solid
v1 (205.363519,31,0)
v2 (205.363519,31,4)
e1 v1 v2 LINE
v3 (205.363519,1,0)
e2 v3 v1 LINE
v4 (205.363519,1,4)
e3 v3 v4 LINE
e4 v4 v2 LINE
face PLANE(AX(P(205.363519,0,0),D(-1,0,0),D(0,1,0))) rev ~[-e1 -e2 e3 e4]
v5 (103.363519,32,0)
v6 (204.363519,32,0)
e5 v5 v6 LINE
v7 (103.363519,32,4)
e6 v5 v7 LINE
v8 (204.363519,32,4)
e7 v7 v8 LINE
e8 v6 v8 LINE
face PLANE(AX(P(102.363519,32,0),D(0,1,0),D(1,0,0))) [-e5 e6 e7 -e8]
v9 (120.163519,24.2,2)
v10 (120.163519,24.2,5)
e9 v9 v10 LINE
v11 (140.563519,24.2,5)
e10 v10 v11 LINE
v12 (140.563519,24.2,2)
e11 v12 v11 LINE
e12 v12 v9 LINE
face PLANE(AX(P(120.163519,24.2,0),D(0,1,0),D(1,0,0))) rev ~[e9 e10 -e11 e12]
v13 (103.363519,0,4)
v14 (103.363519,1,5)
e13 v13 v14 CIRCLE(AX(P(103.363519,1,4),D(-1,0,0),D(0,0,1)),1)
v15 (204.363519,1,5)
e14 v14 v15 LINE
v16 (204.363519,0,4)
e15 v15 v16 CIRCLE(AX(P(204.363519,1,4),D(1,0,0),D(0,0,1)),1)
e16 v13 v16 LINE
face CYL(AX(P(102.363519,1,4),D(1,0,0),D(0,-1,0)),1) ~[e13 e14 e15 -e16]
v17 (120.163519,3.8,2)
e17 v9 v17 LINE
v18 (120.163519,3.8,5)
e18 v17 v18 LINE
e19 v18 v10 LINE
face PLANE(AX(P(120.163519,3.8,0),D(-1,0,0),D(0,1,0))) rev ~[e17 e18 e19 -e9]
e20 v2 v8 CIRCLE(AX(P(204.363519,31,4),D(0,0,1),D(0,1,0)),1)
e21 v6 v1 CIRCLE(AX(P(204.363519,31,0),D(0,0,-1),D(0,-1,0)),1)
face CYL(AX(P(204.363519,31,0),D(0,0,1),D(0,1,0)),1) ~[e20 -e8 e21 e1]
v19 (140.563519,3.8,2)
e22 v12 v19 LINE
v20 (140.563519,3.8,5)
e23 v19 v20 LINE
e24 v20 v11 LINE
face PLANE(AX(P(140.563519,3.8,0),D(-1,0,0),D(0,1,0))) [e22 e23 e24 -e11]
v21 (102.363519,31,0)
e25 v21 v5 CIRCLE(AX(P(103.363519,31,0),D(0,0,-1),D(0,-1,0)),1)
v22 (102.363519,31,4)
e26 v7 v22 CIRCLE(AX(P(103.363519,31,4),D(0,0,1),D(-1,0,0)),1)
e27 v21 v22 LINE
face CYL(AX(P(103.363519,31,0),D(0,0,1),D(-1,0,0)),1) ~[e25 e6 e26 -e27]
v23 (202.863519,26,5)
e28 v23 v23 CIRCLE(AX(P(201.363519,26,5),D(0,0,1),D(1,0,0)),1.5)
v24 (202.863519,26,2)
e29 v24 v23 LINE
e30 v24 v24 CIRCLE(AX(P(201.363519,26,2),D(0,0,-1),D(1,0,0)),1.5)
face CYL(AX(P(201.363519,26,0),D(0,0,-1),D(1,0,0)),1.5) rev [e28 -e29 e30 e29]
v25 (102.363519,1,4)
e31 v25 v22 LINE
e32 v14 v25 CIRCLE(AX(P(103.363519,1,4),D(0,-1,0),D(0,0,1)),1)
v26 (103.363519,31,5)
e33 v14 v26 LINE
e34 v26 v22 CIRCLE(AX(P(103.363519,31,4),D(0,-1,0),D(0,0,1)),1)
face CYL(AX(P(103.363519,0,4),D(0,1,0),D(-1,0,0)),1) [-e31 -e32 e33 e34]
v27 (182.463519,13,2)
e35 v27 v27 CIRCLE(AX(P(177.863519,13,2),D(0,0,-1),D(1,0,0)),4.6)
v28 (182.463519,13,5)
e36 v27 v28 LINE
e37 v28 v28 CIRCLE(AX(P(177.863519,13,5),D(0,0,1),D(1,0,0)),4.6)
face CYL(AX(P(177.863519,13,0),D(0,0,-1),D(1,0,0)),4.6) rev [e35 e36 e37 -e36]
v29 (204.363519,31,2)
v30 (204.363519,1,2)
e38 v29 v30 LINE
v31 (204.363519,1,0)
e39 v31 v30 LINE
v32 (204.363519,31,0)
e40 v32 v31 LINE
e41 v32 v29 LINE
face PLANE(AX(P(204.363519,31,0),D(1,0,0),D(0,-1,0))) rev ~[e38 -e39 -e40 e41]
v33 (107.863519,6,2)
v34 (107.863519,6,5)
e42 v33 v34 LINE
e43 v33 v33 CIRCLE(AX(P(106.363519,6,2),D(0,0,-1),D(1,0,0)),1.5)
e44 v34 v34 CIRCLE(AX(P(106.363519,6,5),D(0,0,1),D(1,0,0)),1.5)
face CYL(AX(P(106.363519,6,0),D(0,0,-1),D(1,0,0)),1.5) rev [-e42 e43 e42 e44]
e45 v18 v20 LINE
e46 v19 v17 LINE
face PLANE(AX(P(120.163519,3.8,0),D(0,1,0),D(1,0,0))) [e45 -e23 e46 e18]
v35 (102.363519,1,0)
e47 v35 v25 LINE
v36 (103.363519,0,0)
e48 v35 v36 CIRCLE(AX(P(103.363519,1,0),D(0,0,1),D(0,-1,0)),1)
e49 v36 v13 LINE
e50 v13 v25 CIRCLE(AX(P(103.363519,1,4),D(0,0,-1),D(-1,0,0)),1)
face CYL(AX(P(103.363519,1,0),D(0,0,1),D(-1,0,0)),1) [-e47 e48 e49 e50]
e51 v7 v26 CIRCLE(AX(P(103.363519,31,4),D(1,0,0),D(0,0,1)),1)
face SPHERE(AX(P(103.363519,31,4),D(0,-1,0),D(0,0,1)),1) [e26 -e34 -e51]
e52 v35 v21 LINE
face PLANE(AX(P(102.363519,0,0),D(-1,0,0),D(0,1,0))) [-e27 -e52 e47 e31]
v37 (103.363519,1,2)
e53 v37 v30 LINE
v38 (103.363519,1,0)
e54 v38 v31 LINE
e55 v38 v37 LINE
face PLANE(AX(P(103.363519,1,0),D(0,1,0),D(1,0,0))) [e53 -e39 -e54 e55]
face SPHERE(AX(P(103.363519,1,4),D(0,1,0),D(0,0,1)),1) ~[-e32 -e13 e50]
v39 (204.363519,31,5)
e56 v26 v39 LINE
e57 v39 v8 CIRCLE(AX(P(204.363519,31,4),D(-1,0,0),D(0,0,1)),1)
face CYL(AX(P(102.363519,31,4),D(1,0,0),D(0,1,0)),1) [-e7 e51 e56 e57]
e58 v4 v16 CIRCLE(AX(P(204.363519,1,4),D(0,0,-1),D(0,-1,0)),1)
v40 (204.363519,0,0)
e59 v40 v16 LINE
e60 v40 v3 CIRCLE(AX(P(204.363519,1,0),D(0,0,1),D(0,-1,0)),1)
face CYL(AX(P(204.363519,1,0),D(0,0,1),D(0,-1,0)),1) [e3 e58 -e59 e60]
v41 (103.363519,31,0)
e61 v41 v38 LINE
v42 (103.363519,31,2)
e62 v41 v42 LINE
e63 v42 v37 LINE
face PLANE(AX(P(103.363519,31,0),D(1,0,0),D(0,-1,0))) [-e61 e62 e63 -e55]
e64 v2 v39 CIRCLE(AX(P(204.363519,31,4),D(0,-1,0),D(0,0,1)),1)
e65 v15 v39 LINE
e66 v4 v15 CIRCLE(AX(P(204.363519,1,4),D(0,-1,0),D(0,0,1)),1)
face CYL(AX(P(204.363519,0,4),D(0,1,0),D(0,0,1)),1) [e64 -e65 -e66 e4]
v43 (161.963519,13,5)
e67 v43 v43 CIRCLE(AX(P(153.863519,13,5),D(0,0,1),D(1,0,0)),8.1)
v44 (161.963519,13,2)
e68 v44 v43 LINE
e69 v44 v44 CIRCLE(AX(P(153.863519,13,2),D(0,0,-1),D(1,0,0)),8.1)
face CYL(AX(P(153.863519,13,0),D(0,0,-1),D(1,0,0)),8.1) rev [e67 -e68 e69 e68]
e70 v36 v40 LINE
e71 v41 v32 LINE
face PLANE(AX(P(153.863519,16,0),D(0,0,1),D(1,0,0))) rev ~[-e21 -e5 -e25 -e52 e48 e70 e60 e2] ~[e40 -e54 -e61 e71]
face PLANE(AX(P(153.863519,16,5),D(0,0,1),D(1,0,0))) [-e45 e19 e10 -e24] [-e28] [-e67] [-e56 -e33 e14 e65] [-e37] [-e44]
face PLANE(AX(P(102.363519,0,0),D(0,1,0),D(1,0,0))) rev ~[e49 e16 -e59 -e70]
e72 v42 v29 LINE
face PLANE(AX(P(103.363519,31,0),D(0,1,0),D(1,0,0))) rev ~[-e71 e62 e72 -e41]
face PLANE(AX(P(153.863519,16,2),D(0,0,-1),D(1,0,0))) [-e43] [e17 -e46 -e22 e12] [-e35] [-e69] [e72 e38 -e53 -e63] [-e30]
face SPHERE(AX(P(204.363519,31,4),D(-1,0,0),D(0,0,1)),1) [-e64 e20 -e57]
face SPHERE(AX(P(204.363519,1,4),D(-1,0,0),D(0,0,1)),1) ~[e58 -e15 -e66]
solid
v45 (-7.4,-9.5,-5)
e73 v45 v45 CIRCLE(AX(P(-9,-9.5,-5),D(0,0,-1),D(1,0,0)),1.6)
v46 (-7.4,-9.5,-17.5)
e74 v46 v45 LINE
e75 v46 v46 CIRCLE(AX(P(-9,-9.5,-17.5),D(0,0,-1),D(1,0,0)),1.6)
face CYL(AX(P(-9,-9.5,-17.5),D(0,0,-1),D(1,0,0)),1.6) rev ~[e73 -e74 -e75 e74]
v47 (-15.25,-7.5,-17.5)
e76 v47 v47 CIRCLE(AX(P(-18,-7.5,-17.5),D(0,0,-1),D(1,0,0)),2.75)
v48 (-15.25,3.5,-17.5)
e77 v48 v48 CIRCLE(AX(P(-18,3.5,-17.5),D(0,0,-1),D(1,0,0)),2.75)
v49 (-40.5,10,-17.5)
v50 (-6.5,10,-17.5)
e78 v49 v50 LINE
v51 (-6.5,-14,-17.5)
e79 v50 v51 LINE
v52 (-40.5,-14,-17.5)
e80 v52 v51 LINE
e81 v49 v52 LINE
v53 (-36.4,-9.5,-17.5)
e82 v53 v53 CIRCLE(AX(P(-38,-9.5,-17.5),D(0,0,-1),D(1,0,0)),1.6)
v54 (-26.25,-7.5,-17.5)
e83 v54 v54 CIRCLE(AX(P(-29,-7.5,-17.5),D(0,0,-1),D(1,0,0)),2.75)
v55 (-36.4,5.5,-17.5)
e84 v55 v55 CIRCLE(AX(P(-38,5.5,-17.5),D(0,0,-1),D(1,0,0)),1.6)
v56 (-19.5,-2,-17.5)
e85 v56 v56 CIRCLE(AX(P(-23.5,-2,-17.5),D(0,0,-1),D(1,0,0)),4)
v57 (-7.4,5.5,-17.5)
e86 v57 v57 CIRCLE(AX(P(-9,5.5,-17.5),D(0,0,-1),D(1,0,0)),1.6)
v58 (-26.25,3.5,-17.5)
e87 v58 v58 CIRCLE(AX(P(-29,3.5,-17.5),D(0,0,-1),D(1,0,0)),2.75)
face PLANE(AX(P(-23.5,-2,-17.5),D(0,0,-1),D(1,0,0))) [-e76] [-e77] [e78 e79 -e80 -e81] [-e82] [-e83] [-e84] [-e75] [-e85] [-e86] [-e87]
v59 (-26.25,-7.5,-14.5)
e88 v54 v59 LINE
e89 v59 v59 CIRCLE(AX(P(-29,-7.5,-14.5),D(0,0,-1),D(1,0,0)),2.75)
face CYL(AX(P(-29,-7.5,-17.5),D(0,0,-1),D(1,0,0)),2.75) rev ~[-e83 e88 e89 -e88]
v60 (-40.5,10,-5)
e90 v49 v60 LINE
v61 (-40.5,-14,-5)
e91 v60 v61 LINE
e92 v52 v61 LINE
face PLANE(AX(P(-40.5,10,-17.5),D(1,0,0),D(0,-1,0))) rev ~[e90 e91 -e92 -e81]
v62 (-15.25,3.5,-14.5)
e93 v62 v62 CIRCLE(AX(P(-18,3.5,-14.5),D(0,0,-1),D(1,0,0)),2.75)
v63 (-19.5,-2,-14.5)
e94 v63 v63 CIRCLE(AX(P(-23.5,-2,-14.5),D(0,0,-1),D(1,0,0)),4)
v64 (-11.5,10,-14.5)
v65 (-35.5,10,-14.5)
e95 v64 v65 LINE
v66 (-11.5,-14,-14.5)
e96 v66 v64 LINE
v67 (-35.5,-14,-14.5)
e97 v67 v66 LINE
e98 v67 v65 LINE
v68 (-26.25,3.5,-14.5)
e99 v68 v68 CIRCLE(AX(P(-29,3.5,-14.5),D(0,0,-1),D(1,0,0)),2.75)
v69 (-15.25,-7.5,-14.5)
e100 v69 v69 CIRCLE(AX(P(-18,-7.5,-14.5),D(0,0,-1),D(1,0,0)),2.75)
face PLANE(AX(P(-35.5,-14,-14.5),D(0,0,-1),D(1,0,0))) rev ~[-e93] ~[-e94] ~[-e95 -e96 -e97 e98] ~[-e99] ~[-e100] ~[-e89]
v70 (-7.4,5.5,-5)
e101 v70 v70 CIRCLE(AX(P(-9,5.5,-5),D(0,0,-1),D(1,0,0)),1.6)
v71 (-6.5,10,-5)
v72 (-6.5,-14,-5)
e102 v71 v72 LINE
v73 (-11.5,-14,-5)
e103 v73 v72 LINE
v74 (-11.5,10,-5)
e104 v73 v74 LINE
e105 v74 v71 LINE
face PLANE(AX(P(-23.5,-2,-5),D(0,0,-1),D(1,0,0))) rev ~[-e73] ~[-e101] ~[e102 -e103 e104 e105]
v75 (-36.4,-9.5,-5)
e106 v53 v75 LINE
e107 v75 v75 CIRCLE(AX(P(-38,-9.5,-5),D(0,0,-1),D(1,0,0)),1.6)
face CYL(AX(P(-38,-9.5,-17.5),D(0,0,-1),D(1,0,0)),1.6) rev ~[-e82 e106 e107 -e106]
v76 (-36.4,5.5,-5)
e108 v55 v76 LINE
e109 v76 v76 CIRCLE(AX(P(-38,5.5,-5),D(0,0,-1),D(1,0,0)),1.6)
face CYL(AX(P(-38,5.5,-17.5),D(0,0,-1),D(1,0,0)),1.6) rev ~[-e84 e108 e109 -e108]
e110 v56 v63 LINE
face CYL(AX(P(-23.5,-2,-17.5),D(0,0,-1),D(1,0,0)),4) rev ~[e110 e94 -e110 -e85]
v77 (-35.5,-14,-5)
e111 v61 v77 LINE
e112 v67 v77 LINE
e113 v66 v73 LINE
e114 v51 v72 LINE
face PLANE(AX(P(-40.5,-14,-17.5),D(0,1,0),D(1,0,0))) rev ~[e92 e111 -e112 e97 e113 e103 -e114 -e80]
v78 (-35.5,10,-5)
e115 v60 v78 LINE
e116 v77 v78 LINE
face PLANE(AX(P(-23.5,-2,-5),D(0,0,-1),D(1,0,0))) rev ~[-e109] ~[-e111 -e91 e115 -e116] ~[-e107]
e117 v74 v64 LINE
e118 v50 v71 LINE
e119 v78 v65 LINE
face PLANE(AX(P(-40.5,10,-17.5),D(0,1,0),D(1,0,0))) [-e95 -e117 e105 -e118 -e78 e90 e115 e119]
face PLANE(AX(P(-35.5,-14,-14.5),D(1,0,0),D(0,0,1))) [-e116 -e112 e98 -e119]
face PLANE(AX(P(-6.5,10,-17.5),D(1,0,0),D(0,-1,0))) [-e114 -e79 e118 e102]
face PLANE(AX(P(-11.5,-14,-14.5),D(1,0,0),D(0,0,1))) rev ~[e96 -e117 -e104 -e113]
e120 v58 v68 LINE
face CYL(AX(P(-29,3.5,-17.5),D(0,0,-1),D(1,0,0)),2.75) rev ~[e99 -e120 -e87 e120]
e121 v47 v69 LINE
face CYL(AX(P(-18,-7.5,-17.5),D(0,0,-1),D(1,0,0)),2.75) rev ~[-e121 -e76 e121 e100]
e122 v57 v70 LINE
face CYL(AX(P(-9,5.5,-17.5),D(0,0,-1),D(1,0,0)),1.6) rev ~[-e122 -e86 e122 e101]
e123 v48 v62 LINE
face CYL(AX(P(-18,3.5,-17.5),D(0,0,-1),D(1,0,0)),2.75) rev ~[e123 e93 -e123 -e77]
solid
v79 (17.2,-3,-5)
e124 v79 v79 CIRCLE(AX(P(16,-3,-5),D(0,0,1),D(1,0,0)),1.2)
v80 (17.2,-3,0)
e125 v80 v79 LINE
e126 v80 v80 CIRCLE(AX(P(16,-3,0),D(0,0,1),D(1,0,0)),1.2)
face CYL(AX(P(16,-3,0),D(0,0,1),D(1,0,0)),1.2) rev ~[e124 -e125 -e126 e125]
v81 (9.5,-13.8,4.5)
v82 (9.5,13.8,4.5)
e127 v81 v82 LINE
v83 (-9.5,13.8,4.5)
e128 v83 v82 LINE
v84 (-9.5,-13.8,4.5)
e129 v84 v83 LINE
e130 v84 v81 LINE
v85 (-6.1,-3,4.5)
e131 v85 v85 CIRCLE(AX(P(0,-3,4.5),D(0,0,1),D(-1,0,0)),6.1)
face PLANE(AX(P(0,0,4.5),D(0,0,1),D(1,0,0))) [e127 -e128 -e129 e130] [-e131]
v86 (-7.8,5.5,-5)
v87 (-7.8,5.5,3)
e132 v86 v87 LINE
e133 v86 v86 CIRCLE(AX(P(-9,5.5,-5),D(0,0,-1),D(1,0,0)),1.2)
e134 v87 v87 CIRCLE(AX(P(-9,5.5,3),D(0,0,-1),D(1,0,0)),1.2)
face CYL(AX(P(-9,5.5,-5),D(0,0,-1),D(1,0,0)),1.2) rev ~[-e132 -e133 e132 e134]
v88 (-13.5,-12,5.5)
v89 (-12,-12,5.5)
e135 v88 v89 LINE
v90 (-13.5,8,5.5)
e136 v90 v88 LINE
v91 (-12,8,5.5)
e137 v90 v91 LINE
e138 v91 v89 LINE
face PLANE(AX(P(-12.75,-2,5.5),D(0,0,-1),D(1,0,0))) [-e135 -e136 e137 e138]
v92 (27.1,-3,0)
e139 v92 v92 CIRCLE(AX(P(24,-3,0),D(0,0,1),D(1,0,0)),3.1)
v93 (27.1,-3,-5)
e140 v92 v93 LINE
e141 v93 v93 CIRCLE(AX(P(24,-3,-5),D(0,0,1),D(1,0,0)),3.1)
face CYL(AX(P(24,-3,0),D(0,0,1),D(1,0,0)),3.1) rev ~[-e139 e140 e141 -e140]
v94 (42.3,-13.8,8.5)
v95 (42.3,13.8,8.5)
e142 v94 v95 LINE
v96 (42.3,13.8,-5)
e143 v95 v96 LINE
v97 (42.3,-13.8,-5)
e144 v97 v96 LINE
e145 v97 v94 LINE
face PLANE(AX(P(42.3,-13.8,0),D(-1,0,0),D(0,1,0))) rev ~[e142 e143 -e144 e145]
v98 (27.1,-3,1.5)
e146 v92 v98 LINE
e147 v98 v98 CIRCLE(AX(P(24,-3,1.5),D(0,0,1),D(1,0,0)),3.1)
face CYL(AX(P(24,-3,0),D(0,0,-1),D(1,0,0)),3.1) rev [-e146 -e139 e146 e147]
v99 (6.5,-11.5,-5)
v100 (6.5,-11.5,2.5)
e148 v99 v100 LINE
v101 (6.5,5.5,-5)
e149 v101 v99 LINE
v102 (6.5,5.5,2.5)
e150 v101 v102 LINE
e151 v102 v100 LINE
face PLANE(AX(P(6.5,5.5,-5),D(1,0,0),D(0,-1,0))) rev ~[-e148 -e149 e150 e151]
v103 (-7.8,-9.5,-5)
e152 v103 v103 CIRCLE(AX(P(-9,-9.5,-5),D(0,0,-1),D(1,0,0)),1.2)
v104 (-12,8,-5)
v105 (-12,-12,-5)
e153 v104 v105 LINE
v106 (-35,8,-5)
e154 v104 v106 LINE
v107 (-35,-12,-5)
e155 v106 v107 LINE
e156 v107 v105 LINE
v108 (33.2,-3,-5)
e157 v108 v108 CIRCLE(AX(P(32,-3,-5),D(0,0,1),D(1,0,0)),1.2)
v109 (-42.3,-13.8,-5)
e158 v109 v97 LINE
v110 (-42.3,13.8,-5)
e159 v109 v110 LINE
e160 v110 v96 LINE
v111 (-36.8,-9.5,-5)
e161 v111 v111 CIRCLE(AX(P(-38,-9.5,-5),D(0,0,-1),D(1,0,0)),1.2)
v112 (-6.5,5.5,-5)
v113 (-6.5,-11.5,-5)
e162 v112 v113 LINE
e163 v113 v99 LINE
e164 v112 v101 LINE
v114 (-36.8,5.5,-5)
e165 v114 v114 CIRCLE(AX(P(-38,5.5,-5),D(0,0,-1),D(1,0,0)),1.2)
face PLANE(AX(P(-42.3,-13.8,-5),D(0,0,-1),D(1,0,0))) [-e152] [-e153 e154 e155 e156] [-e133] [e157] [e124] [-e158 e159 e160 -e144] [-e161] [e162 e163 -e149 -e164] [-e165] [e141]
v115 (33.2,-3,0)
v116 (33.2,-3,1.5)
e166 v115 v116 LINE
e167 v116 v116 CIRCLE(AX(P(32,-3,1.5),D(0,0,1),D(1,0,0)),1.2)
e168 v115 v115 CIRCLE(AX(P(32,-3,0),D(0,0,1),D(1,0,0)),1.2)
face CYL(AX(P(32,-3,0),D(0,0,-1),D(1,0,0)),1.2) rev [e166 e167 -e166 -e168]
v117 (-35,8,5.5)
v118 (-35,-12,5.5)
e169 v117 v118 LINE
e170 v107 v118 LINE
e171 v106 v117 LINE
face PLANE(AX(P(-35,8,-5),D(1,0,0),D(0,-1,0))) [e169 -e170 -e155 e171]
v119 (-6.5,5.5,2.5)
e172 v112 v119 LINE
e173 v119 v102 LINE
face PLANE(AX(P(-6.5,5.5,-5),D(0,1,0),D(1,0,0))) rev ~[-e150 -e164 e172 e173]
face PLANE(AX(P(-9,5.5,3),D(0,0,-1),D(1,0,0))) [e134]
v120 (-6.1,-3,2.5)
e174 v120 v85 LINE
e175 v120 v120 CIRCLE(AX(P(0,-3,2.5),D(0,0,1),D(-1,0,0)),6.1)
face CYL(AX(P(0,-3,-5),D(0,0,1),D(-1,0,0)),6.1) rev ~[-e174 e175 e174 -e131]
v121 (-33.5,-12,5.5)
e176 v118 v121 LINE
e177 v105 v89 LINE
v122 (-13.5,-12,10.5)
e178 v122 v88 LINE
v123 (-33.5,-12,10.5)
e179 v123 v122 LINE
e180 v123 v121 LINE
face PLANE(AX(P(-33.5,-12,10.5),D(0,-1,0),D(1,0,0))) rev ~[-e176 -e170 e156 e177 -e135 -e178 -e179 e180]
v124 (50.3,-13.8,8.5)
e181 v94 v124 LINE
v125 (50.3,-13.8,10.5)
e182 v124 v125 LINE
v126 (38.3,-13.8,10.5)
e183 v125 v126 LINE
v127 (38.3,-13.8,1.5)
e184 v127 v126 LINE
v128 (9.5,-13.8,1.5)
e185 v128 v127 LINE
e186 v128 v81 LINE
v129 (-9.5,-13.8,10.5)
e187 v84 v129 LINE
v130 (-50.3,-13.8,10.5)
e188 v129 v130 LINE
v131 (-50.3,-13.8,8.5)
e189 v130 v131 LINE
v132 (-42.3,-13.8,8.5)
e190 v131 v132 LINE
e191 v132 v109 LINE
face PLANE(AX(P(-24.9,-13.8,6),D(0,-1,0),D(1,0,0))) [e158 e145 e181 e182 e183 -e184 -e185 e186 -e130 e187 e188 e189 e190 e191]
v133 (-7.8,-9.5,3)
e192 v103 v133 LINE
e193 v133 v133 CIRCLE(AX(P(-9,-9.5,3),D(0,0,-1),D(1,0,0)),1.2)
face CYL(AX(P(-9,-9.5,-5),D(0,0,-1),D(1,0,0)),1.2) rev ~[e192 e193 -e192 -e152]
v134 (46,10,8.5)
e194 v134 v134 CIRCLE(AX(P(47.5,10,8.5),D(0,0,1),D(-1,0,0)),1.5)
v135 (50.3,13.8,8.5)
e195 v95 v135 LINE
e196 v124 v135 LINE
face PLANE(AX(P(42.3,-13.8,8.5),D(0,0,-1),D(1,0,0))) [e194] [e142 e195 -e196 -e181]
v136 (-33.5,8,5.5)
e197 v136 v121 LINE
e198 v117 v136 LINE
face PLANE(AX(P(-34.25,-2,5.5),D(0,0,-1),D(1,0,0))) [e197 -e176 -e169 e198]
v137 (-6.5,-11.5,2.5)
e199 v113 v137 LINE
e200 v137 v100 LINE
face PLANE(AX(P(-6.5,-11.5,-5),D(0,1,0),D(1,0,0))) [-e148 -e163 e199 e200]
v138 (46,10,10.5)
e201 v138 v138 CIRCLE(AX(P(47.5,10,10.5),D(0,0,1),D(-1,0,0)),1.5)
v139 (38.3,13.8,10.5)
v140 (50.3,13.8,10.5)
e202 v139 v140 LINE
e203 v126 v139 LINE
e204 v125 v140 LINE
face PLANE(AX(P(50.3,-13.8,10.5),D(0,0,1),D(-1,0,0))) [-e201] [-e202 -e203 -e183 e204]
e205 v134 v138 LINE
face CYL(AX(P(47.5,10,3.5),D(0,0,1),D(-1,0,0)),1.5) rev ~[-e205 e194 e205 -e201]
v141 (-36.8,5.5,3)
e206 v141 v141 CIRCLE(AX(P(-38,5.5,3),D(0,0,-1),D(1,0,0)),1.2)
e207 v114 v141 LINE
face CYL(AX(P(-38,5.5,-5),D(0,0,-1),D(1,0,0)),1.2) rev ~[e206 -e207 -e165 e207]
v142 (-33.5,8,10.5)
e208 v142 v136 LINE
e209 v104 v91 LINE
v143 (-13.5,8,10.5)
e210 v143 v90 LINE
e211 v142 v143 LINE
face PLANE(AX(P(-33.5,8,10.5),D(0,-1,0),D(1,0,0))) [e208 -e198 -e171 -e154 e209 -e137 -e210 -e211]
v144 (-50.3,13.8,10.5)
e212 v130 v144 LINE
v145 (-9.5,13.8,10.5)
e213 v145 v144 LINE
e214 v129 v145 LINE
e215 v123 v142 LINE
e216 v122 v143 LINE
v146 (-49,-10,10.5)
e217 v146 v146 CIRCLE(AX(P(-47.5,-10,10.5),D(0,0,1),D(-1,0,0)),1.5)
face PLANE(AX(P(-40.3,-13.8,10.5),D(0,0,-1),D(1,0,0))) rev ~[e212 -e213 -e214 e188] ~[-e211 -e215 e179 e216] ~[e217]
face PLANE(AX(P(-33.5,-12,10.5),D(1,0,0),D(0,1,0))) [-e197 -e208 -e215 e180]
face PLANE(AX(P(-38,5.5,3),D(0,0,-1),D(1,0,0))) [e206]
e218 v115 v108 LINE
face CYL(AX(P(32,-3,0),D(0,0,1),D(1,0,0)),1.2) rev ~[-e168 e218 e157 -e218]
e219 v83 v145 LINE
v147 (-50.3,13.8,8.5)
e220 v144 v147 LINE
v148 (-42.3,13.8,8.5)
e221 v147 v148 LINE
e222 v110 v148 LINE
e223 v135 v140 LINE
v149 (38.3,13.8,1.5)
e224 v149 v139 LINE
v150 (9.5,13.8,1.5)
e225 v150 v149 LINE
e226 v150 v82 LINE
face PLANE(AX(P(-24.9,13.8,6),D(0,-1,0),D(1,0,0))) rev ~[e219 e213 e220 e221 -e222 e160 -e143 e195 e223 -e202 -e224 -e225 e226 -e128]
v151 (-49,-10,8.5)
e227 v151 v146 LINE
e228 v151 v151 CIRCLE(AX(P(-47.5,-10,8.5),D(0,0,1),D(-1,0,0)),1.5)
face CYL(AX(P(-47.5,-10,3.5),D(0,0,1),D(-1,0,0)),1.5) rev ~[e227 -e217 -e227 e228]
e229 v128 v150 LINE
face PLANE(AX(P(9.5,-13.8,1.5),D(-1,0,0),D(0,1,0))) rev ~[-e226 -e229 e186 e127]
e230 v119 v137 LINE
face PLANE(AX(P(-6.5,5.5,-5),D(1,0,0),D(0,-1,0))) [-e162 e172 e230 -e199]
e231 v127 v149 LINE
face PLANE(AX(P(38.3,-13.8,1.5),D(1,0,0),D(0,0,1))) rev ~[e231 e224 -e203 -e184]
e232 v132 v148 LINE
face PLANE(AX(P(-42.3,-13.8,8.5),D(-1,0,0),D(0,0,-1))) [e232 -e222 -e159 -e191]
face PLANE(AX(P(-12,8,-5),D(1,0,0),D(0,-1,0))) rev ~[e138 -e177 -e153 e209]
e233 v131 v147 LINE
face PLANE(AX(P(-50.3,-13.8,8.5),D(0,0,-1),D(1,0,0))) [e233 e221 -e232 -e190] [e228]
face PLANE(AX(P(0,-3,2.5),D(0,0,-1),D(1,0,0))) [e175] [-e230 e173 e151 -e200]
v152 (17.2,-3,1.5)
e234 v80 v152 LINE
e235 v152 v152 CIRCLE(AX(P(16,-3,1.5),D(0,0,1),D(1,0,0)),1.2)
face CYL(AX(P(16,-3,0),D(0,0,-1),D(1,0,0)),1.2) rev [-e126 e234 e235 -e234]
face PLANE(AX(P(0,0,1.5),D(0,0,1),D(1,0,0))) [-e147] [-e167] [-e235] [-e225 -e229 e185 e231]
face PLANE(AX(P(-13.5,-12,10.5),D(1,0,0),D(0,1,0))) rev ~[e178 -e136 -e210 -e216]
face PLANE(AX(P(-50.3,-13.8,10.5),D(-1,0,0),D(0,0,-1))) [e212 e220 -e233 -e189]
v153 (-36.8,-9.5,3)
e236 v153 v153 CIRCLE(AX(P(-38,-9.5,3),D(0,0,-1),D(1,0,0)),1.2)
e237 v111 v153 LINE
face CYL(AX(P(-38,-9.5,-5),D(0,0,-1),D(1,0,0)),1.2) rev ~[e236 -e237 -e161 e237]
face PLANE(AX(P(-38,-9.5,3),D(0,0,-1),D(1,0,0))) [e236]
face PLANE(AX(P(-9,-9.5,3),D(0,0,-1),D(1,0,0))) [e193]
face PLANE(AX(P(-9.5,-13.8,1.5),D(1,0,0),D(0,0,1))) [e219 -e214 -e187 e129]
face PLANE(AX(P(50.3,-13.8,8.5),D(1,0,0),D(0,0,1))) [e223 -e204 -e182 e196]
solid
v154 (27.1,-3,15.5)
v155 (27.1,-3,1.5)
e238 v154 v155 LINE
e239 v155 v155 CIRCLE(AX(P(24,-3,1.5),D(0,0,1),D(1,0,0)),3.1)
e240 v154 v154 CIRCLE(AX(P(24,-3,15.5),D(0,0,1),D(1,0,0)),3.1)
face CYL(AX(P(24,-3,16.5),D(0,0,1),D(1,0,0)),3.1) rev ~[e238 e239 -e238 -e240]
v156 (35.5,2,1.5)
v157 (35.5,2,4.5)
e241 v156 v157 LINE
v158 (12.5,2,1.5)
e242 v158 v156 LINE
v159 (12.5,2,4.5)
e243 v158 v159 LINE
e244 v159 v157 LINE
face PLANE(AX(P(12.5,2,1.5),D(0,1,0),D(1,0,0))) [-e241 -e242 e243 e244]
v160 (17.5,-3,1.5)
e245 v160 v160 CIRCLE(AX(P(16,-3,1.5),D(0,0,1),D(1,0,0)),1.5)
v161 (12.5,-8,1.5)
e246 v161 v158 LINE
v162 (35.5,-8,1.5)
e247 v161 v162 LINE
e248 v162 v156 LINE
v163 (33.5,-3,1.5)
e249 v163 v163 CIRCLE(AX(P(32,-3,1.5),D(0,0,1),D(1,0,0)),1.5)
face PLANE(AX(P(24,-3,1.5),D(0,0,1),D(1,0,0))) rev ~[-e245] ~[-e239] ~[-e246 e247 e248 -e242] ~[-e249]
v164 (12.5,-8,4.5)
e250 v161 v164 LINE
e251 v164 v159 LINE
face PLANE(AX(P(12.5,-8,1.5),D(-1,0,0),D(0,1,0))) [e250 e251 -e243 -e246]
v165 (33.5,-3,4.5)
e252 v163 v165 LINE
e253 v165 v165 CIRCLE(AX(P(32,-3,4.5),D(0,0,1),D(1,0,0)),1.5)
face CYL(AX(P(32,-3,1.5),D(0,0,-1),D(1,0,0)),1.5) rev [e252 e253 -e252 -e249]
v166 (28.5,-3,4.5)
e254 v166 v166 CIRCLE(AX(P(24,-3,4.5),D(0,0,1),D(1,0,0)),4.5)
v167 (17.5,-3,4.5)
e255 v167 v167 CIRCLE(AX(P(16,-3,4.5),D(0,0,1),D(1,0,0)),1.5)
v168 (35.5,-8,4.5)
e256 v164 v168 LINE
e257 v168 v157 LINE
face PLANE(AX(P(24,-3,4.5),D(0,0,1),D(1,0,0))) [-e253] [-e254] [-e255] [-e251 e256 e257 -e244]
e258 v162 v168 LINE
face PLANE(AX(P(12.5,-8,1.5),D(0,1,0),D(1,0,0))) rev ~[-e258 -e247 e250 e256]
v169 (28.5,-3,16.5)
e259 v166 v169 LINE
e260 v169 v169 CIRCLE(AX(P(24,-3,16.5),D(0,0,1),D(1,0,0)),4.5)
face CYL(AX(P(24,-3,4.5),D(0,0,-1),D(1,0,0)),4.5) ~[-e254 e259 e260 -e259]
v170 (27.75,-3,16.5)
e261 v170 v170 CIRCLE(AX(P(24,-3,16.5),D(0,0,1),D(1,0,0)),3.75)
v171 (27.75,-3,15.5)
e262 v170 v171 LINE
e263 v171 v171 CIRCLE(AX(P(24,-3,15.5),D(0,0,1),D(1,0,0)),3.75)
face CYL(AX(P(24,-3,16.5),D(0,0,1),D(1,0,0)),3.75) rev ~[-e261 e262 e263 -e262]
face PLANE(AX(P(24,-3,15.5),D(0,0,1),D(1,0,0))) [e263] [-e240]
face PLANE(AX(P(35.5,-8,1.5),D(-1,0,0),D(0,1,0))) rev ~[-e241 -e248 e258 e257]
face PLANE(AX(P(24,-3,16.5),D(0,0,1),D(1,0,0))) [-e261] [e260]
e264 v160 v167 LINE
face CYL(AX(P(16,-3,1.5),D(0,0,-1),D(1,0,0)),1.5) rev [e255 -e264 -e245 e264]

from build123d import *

# Parameters (mm, degrees)
F0_W      = 84.6
F0_H      = 27.6
F0_R      = 1.2
F0_R_2    = 3.1
F1_DEPTH  = 1.5
F2_W      = 103
F2_H      = 32
F2_R      = 1.5
F2_W_2    = 20.4
F2_H_2    = 20.4
F2_R_2    = 8.1
F2_R_3    = 4.6
F3_DEPTH  = 5
F4_W      = 101
F4_H      = 30
F5_DEPTH  = 2
F6_R      = 1
F7_W      = 8
F7_H      = 2
F8_DEPTH  = 27.6
F9_D      = 3
F9_DEPTH  = 5
F9_START  = 8.5
F9_TIP    = 0.9012909285
F10_W     = 23
F10_H     = 10
F10_R     = 1.5
F11_DEPTH = 3
F12_R     = 4.5
F13_DEPTH = 12
F14_R     = 3.1
F15_DEPTH = 25
F16_W     = 19
F16_H     = 27.6
F17_DEPTH = 3
F18_D     = 12.2
F18_DEPTH = 5
F18_TIP   = 3.6652497761
F19_R     = 3.75
F20_DEPTH = 1
F21_W     = 30.8
F21_H     = 9
F21_W_2   = 2
F21_W_3   = 84.6
F21_H_2   = 5
F22_DEPTH = 27.6
F23_W     = 20
F23_H     = 20
F24_DEPTH = 25
F25_W     = 1.5
F25_H     = 20
F26_DEPTH = 10.5
F27_W     = 13
F27_H     = 17
F28_DEPTH = 7.5
F30_W     = 34
F30_H     = 24
F31_DEPTH = 12.5
F32_W     = 24
F32_H     = 9.5
F33_DEPTH = 25
F34_R     = 4
F34_R_2   = 1.6
F34_R_3   = 2.75
F35_DEPTH = 25
F36_R     = 1.2
F37_DEPTH = 8
F38_DEPTH = 25


with BuildPart() as f1:
    # F0 (on Top) → F1 (new body)
    with BuildSketch(Plane.XY):
        Rectangle(F0_W, F0_H)
        with Locations((16, -3)):
            Circle(F0_R, mode=Mode.SUBTRACT)
        with Locations((24, -3)):
            Circle(F0_R_2, mode=Mode.SUBTRACT)
        with Locations((32, -3)):
            Circle(F0_R, mode=Mode.SUBTRACT)
    extrude(amount=F1_DEPTH)

    # F7 (on face) → F8 (join)
    with BuildSketch(Plane.XZ.offset(13.8)):
        Polygon((-42.3, 8.5), (-42.3, 1.5), (-40.3, 1.5), (-40.3, 10.5), (-50.3, 10.5), (-50.3, 8.5), align=None)
        Polygon((42.3, 8.5), (42.3, 10.5), (40.3, 10.5), (40.3, 1.5), (42.3, 1.5), align=None)
        with Locations((46.3, 9.5)):
            Rectangle(F7_W, F7_H)
    extrude(amount=-F8_DEPTH)

    # F9
    # its depths count from where the whole tool has entered the part; down to there all is cleared
    with Locations(Plane(origin=(0, 0, 0), x_dir=(1, 0, 0), z_dir=(0, 0, -1))):
        with Locations((-47.5, 10), (47.5, -10)):
            Hole(F9_D / 2, depth=F9_START)
    with Locations(Plane(origin=(0, 0, 0), x_dir=(1, 0, 0), z_dir=(0, 0, -1)).offset(-F9_START)):
        with Locations((-47.5, 10), (47.5, -10)):
            Hole(F9_D / 2, depth=F9_DEPTH)
            with Locations((0, 0, -(F9_DEPTH + F9_TIP / 2))):  # 118° drill point
                Cone(0, F9_D / 2, F9_TIP, mode=Mode.SUBTRACT)

    # F16 (on face) → F17 (join)
    with BuildSketch(Plane.XY.offset(1.5)):
        Rectangle(F16_W, F16_H)
    extrude(amount=F17_DEPTH)

    # F18
    with Locations(Plane(origin=(0, 0, 0), x_dir=(1, 0, 0), z_dir=(0, 0, -1))):
        with Locations((0, 3)):
            Hole(F18_D / 2, depth=F18_DEPTH)
            with Locations((0, 0, -(F18_DEPTH + F18_TIP / 2))):  # 118° drill point
                Cone(0, F18_D / 2, F18_TIP, mode=Mode.SUBTRACT)

    # F21 (on face) → F22 (join)
    with BuildSketch(Plane.XZ.offset(13.8)):
        with Locations((-24.9, 6)):
            Rectangle(F21_W, F21_H)
        with Locations((39.3, 6)):
            Rectangle(F21_W_2, F21_H)
        with Locations((0, -2.5)):
            Rectangle(F21_W_3, F21_H_2)
    extrude(amount=-F22_DEPTH)

    # F23 (on face) → F24 (cut)
    with BuildSketch(Plane.XY.offset(10.5)):
        with Locations((-23.5, -2)):
            Rectangle(F23_W, F23_H)
    extrude(amount=-F24_DEPTH, mode=Mode.SUBTRACT)

    # F25 (on face) → F26 (cut)
    with BuildSketch(Plane(origin=(0, 0, -5), x_dir=(1, 0, 0), z_dir=(0, 0, -1))):
        with Locations((-34.25, 2)):
            Rectangle(F25_W, F25_H)
        with Locations((-12.75, 2)):
            Rectangle(F25_W, F25_H)
    extrude(amount=-F26_DEPTH, mode=Mode.SUBTRACT)

    # F27 (on face) → F28 (cut)
    with BuildSketch(Plane(origin=(0, 0, -5), x_dir=(1, 0, 0), z_dir=(0, 0, -1))):
        with Locations((0, 3)):
            Rectangle(F27_W, F27_H)
    extrude(amount=-F28_DEPTH, mode=Mode.SUBTRACT)

    # F36 (on face) → F37 (cut)
    with BuildSketch(Plane(origin=(0, 0, -5), x_dir=(1, 0, 0), z_dir=(0, 0, -1))):
        with Locations((-38, 9.5)):
            Circle(F36_R)
        with Locations((-38, -5.5)):
            Circle(F36_R)
        with Locations((-9, 9.5)):
            Circle(F36_R)
        with Locations((-9, -5.5)):
            Circle(F36_R)
    extrude(amount=-F37_DEPTH, mode=Mode.SUBTRACT)

    # F38 (cut): faces of the model
    f38_faces = [f1.faces().sort_by_distance(p)[0] for p in [
        (16, -3, 0),
        (24, -3, 0),
        (32, -3, 0),
    ]]
    extrude(f38_faces, amount=-F38_DEPTH, mode=Mode.SUBTRACT)


with BuildPart() as f3:
    # F2 (on Top) → F3 (new body)
    with BuildSketch(Plane.XY):
        with Locations((153.8635194302, 16)):
            Rectangle(F2_W, F2_H)
        with Locations((106.3635194302, 6)):
            Circle(F2_R, mode=Mode.SUBTRACT)
        with Locations((130.3635194302, 14)):
            Rectangle(F2_W_2, F2_H_2, mode=Mode.SUBTRACT)
        with Locations((153.8635194302, 13)):
            Circle(F2_R_2, mode=Mode.SUBTRACT)
        with Locations((177.8635194302, 13)):
            Circle(F2_R_3, mode=Mode.SUBTRACT)
        with Locations((201.3635194302, 26)):
            Circle(F2_R, mode=Mode.SUBTRACT)
    extrude(amount=F3_DEPTH)

    # F4 (on face) → F5 (cut)
    with BuildSketch(Plane(origin=(0, 0, 0), x_dir=(1, 0, 0), z_dir=(0, 0, -1))):
        with Locations((153.8635194302, -16)):
            Rectangle(F4_W, F4_H)
    extrude(amount=-F5_DEPTH, mode=Mode.SUBTRACT)

    # F6
    f6_edges = [f3.edges().sort_by_distance(p)[0] for p in [
        (102.363519, 16, 5),
        (153.863519, 32, 5),
        (153.863519, 0, 5),
        (205.363519, 16, 5),
        (205.363519, 32, 2.5),
        (205.363519, 0, 2.5),
        (102.363519, 32, 2.5),
        (102.363519, 0, 2.5),
    ]]
    fillet(f6_edges, radius=F6_R)


with BuildPart() as f11:
    # F10 (on face) → F11 (new body)
    with BuildSketch(Plane.XY.offset(1.5)):
        with Locations((24, -3)):
            Rectangle(F10_W, F10_H)
        with Locations((16, -3)):
            Circle(F10_R, mode=Mode.SUBTRACT)
        with Locations((32, -3)):
            Circle(F10_R, mode=Mode.SUBTRACT)
    extrude(amount=F11_DEPTH)

    # F12 (on face) → F13 (join)
    with BuildSketch(Plane.XY.offset(4.5)):
        with Locations((24, -3)):
            Circle(F12_R)
    extrude(amount=F13_DEPTH)

    # F14 (on face) → F15 (cut)
    with BuildSketch(Plane.XY.offset(16.5)):
        with Locations((24, -3)):
            Circle(F14_R)
    extrude(amount=-F15_DEPTH, mode=Mode.SUBTRACT)

    # F19 (on face) → F20 (cut)
    with BuildSketch(Plane.XY.offset(16.5)):
        with Locations((24, -3)):
            Circle(F19_R)
    extrude(amount=-F20_DEPTH, mode=Mode.SUBTRACT)


with BuildPart() as f31:
    # F30 (on offset) → F31 (new body)
    with BuildSketch(Plane(origin=(0, 0, -17.5), x_dir=(1, 0, 0), z_dir=(0, 0, -1))):
        with Locations((-23.5, 2)):
            Rectangle(F30_W, F30_H)
    extrude(amount=-F31_DEPTH)

    # F32 (on face) → F33 (cut)
    with BuildSketch(Plane.XZ.offset(14)):
        with Locations((-23.5, -9.75)):
            Rectangle(F32_W, F32_H)
    extrude(amount=-F33_DEPTH, mode=Mode.SUBTRACT)

    # F34 (on face) → F35 (cut)
    with BuildSketch(Plane(origin=(0, 0, -17.5), x_dir=(1, 0, 0), z_dir=(0, 0, -1))):
        with Locations((-23.5, 2)):
            Circle(F34_R)
        with Locations((-38, 9.5)):
            Circle(F34_R_2)
        with Locations((-38, -5.5)):
            Circle(F34_R_2)
        with Locations((-9, 9.5)):
            Circle(F34_R_2)
        with Locations((-9, -5.5)):
            Circle(F34_R_2)
        with Locations((-29, 7.5)):
            Circle(F34_R_3)
        with Locations((-18, 7.5)):
            Circle(F34_R_3)
        with Locations((-29, -3.5)):
            Circle(F34_R_3)
        with Locations((-18, -3.5)):
            Circle(F34_R_3)
    extrude(amount=-F35_DEPTH, mode=Mode.SUBTRACT)


solid = Compound([f1.part, f3.part, f11.part, f31.part])
